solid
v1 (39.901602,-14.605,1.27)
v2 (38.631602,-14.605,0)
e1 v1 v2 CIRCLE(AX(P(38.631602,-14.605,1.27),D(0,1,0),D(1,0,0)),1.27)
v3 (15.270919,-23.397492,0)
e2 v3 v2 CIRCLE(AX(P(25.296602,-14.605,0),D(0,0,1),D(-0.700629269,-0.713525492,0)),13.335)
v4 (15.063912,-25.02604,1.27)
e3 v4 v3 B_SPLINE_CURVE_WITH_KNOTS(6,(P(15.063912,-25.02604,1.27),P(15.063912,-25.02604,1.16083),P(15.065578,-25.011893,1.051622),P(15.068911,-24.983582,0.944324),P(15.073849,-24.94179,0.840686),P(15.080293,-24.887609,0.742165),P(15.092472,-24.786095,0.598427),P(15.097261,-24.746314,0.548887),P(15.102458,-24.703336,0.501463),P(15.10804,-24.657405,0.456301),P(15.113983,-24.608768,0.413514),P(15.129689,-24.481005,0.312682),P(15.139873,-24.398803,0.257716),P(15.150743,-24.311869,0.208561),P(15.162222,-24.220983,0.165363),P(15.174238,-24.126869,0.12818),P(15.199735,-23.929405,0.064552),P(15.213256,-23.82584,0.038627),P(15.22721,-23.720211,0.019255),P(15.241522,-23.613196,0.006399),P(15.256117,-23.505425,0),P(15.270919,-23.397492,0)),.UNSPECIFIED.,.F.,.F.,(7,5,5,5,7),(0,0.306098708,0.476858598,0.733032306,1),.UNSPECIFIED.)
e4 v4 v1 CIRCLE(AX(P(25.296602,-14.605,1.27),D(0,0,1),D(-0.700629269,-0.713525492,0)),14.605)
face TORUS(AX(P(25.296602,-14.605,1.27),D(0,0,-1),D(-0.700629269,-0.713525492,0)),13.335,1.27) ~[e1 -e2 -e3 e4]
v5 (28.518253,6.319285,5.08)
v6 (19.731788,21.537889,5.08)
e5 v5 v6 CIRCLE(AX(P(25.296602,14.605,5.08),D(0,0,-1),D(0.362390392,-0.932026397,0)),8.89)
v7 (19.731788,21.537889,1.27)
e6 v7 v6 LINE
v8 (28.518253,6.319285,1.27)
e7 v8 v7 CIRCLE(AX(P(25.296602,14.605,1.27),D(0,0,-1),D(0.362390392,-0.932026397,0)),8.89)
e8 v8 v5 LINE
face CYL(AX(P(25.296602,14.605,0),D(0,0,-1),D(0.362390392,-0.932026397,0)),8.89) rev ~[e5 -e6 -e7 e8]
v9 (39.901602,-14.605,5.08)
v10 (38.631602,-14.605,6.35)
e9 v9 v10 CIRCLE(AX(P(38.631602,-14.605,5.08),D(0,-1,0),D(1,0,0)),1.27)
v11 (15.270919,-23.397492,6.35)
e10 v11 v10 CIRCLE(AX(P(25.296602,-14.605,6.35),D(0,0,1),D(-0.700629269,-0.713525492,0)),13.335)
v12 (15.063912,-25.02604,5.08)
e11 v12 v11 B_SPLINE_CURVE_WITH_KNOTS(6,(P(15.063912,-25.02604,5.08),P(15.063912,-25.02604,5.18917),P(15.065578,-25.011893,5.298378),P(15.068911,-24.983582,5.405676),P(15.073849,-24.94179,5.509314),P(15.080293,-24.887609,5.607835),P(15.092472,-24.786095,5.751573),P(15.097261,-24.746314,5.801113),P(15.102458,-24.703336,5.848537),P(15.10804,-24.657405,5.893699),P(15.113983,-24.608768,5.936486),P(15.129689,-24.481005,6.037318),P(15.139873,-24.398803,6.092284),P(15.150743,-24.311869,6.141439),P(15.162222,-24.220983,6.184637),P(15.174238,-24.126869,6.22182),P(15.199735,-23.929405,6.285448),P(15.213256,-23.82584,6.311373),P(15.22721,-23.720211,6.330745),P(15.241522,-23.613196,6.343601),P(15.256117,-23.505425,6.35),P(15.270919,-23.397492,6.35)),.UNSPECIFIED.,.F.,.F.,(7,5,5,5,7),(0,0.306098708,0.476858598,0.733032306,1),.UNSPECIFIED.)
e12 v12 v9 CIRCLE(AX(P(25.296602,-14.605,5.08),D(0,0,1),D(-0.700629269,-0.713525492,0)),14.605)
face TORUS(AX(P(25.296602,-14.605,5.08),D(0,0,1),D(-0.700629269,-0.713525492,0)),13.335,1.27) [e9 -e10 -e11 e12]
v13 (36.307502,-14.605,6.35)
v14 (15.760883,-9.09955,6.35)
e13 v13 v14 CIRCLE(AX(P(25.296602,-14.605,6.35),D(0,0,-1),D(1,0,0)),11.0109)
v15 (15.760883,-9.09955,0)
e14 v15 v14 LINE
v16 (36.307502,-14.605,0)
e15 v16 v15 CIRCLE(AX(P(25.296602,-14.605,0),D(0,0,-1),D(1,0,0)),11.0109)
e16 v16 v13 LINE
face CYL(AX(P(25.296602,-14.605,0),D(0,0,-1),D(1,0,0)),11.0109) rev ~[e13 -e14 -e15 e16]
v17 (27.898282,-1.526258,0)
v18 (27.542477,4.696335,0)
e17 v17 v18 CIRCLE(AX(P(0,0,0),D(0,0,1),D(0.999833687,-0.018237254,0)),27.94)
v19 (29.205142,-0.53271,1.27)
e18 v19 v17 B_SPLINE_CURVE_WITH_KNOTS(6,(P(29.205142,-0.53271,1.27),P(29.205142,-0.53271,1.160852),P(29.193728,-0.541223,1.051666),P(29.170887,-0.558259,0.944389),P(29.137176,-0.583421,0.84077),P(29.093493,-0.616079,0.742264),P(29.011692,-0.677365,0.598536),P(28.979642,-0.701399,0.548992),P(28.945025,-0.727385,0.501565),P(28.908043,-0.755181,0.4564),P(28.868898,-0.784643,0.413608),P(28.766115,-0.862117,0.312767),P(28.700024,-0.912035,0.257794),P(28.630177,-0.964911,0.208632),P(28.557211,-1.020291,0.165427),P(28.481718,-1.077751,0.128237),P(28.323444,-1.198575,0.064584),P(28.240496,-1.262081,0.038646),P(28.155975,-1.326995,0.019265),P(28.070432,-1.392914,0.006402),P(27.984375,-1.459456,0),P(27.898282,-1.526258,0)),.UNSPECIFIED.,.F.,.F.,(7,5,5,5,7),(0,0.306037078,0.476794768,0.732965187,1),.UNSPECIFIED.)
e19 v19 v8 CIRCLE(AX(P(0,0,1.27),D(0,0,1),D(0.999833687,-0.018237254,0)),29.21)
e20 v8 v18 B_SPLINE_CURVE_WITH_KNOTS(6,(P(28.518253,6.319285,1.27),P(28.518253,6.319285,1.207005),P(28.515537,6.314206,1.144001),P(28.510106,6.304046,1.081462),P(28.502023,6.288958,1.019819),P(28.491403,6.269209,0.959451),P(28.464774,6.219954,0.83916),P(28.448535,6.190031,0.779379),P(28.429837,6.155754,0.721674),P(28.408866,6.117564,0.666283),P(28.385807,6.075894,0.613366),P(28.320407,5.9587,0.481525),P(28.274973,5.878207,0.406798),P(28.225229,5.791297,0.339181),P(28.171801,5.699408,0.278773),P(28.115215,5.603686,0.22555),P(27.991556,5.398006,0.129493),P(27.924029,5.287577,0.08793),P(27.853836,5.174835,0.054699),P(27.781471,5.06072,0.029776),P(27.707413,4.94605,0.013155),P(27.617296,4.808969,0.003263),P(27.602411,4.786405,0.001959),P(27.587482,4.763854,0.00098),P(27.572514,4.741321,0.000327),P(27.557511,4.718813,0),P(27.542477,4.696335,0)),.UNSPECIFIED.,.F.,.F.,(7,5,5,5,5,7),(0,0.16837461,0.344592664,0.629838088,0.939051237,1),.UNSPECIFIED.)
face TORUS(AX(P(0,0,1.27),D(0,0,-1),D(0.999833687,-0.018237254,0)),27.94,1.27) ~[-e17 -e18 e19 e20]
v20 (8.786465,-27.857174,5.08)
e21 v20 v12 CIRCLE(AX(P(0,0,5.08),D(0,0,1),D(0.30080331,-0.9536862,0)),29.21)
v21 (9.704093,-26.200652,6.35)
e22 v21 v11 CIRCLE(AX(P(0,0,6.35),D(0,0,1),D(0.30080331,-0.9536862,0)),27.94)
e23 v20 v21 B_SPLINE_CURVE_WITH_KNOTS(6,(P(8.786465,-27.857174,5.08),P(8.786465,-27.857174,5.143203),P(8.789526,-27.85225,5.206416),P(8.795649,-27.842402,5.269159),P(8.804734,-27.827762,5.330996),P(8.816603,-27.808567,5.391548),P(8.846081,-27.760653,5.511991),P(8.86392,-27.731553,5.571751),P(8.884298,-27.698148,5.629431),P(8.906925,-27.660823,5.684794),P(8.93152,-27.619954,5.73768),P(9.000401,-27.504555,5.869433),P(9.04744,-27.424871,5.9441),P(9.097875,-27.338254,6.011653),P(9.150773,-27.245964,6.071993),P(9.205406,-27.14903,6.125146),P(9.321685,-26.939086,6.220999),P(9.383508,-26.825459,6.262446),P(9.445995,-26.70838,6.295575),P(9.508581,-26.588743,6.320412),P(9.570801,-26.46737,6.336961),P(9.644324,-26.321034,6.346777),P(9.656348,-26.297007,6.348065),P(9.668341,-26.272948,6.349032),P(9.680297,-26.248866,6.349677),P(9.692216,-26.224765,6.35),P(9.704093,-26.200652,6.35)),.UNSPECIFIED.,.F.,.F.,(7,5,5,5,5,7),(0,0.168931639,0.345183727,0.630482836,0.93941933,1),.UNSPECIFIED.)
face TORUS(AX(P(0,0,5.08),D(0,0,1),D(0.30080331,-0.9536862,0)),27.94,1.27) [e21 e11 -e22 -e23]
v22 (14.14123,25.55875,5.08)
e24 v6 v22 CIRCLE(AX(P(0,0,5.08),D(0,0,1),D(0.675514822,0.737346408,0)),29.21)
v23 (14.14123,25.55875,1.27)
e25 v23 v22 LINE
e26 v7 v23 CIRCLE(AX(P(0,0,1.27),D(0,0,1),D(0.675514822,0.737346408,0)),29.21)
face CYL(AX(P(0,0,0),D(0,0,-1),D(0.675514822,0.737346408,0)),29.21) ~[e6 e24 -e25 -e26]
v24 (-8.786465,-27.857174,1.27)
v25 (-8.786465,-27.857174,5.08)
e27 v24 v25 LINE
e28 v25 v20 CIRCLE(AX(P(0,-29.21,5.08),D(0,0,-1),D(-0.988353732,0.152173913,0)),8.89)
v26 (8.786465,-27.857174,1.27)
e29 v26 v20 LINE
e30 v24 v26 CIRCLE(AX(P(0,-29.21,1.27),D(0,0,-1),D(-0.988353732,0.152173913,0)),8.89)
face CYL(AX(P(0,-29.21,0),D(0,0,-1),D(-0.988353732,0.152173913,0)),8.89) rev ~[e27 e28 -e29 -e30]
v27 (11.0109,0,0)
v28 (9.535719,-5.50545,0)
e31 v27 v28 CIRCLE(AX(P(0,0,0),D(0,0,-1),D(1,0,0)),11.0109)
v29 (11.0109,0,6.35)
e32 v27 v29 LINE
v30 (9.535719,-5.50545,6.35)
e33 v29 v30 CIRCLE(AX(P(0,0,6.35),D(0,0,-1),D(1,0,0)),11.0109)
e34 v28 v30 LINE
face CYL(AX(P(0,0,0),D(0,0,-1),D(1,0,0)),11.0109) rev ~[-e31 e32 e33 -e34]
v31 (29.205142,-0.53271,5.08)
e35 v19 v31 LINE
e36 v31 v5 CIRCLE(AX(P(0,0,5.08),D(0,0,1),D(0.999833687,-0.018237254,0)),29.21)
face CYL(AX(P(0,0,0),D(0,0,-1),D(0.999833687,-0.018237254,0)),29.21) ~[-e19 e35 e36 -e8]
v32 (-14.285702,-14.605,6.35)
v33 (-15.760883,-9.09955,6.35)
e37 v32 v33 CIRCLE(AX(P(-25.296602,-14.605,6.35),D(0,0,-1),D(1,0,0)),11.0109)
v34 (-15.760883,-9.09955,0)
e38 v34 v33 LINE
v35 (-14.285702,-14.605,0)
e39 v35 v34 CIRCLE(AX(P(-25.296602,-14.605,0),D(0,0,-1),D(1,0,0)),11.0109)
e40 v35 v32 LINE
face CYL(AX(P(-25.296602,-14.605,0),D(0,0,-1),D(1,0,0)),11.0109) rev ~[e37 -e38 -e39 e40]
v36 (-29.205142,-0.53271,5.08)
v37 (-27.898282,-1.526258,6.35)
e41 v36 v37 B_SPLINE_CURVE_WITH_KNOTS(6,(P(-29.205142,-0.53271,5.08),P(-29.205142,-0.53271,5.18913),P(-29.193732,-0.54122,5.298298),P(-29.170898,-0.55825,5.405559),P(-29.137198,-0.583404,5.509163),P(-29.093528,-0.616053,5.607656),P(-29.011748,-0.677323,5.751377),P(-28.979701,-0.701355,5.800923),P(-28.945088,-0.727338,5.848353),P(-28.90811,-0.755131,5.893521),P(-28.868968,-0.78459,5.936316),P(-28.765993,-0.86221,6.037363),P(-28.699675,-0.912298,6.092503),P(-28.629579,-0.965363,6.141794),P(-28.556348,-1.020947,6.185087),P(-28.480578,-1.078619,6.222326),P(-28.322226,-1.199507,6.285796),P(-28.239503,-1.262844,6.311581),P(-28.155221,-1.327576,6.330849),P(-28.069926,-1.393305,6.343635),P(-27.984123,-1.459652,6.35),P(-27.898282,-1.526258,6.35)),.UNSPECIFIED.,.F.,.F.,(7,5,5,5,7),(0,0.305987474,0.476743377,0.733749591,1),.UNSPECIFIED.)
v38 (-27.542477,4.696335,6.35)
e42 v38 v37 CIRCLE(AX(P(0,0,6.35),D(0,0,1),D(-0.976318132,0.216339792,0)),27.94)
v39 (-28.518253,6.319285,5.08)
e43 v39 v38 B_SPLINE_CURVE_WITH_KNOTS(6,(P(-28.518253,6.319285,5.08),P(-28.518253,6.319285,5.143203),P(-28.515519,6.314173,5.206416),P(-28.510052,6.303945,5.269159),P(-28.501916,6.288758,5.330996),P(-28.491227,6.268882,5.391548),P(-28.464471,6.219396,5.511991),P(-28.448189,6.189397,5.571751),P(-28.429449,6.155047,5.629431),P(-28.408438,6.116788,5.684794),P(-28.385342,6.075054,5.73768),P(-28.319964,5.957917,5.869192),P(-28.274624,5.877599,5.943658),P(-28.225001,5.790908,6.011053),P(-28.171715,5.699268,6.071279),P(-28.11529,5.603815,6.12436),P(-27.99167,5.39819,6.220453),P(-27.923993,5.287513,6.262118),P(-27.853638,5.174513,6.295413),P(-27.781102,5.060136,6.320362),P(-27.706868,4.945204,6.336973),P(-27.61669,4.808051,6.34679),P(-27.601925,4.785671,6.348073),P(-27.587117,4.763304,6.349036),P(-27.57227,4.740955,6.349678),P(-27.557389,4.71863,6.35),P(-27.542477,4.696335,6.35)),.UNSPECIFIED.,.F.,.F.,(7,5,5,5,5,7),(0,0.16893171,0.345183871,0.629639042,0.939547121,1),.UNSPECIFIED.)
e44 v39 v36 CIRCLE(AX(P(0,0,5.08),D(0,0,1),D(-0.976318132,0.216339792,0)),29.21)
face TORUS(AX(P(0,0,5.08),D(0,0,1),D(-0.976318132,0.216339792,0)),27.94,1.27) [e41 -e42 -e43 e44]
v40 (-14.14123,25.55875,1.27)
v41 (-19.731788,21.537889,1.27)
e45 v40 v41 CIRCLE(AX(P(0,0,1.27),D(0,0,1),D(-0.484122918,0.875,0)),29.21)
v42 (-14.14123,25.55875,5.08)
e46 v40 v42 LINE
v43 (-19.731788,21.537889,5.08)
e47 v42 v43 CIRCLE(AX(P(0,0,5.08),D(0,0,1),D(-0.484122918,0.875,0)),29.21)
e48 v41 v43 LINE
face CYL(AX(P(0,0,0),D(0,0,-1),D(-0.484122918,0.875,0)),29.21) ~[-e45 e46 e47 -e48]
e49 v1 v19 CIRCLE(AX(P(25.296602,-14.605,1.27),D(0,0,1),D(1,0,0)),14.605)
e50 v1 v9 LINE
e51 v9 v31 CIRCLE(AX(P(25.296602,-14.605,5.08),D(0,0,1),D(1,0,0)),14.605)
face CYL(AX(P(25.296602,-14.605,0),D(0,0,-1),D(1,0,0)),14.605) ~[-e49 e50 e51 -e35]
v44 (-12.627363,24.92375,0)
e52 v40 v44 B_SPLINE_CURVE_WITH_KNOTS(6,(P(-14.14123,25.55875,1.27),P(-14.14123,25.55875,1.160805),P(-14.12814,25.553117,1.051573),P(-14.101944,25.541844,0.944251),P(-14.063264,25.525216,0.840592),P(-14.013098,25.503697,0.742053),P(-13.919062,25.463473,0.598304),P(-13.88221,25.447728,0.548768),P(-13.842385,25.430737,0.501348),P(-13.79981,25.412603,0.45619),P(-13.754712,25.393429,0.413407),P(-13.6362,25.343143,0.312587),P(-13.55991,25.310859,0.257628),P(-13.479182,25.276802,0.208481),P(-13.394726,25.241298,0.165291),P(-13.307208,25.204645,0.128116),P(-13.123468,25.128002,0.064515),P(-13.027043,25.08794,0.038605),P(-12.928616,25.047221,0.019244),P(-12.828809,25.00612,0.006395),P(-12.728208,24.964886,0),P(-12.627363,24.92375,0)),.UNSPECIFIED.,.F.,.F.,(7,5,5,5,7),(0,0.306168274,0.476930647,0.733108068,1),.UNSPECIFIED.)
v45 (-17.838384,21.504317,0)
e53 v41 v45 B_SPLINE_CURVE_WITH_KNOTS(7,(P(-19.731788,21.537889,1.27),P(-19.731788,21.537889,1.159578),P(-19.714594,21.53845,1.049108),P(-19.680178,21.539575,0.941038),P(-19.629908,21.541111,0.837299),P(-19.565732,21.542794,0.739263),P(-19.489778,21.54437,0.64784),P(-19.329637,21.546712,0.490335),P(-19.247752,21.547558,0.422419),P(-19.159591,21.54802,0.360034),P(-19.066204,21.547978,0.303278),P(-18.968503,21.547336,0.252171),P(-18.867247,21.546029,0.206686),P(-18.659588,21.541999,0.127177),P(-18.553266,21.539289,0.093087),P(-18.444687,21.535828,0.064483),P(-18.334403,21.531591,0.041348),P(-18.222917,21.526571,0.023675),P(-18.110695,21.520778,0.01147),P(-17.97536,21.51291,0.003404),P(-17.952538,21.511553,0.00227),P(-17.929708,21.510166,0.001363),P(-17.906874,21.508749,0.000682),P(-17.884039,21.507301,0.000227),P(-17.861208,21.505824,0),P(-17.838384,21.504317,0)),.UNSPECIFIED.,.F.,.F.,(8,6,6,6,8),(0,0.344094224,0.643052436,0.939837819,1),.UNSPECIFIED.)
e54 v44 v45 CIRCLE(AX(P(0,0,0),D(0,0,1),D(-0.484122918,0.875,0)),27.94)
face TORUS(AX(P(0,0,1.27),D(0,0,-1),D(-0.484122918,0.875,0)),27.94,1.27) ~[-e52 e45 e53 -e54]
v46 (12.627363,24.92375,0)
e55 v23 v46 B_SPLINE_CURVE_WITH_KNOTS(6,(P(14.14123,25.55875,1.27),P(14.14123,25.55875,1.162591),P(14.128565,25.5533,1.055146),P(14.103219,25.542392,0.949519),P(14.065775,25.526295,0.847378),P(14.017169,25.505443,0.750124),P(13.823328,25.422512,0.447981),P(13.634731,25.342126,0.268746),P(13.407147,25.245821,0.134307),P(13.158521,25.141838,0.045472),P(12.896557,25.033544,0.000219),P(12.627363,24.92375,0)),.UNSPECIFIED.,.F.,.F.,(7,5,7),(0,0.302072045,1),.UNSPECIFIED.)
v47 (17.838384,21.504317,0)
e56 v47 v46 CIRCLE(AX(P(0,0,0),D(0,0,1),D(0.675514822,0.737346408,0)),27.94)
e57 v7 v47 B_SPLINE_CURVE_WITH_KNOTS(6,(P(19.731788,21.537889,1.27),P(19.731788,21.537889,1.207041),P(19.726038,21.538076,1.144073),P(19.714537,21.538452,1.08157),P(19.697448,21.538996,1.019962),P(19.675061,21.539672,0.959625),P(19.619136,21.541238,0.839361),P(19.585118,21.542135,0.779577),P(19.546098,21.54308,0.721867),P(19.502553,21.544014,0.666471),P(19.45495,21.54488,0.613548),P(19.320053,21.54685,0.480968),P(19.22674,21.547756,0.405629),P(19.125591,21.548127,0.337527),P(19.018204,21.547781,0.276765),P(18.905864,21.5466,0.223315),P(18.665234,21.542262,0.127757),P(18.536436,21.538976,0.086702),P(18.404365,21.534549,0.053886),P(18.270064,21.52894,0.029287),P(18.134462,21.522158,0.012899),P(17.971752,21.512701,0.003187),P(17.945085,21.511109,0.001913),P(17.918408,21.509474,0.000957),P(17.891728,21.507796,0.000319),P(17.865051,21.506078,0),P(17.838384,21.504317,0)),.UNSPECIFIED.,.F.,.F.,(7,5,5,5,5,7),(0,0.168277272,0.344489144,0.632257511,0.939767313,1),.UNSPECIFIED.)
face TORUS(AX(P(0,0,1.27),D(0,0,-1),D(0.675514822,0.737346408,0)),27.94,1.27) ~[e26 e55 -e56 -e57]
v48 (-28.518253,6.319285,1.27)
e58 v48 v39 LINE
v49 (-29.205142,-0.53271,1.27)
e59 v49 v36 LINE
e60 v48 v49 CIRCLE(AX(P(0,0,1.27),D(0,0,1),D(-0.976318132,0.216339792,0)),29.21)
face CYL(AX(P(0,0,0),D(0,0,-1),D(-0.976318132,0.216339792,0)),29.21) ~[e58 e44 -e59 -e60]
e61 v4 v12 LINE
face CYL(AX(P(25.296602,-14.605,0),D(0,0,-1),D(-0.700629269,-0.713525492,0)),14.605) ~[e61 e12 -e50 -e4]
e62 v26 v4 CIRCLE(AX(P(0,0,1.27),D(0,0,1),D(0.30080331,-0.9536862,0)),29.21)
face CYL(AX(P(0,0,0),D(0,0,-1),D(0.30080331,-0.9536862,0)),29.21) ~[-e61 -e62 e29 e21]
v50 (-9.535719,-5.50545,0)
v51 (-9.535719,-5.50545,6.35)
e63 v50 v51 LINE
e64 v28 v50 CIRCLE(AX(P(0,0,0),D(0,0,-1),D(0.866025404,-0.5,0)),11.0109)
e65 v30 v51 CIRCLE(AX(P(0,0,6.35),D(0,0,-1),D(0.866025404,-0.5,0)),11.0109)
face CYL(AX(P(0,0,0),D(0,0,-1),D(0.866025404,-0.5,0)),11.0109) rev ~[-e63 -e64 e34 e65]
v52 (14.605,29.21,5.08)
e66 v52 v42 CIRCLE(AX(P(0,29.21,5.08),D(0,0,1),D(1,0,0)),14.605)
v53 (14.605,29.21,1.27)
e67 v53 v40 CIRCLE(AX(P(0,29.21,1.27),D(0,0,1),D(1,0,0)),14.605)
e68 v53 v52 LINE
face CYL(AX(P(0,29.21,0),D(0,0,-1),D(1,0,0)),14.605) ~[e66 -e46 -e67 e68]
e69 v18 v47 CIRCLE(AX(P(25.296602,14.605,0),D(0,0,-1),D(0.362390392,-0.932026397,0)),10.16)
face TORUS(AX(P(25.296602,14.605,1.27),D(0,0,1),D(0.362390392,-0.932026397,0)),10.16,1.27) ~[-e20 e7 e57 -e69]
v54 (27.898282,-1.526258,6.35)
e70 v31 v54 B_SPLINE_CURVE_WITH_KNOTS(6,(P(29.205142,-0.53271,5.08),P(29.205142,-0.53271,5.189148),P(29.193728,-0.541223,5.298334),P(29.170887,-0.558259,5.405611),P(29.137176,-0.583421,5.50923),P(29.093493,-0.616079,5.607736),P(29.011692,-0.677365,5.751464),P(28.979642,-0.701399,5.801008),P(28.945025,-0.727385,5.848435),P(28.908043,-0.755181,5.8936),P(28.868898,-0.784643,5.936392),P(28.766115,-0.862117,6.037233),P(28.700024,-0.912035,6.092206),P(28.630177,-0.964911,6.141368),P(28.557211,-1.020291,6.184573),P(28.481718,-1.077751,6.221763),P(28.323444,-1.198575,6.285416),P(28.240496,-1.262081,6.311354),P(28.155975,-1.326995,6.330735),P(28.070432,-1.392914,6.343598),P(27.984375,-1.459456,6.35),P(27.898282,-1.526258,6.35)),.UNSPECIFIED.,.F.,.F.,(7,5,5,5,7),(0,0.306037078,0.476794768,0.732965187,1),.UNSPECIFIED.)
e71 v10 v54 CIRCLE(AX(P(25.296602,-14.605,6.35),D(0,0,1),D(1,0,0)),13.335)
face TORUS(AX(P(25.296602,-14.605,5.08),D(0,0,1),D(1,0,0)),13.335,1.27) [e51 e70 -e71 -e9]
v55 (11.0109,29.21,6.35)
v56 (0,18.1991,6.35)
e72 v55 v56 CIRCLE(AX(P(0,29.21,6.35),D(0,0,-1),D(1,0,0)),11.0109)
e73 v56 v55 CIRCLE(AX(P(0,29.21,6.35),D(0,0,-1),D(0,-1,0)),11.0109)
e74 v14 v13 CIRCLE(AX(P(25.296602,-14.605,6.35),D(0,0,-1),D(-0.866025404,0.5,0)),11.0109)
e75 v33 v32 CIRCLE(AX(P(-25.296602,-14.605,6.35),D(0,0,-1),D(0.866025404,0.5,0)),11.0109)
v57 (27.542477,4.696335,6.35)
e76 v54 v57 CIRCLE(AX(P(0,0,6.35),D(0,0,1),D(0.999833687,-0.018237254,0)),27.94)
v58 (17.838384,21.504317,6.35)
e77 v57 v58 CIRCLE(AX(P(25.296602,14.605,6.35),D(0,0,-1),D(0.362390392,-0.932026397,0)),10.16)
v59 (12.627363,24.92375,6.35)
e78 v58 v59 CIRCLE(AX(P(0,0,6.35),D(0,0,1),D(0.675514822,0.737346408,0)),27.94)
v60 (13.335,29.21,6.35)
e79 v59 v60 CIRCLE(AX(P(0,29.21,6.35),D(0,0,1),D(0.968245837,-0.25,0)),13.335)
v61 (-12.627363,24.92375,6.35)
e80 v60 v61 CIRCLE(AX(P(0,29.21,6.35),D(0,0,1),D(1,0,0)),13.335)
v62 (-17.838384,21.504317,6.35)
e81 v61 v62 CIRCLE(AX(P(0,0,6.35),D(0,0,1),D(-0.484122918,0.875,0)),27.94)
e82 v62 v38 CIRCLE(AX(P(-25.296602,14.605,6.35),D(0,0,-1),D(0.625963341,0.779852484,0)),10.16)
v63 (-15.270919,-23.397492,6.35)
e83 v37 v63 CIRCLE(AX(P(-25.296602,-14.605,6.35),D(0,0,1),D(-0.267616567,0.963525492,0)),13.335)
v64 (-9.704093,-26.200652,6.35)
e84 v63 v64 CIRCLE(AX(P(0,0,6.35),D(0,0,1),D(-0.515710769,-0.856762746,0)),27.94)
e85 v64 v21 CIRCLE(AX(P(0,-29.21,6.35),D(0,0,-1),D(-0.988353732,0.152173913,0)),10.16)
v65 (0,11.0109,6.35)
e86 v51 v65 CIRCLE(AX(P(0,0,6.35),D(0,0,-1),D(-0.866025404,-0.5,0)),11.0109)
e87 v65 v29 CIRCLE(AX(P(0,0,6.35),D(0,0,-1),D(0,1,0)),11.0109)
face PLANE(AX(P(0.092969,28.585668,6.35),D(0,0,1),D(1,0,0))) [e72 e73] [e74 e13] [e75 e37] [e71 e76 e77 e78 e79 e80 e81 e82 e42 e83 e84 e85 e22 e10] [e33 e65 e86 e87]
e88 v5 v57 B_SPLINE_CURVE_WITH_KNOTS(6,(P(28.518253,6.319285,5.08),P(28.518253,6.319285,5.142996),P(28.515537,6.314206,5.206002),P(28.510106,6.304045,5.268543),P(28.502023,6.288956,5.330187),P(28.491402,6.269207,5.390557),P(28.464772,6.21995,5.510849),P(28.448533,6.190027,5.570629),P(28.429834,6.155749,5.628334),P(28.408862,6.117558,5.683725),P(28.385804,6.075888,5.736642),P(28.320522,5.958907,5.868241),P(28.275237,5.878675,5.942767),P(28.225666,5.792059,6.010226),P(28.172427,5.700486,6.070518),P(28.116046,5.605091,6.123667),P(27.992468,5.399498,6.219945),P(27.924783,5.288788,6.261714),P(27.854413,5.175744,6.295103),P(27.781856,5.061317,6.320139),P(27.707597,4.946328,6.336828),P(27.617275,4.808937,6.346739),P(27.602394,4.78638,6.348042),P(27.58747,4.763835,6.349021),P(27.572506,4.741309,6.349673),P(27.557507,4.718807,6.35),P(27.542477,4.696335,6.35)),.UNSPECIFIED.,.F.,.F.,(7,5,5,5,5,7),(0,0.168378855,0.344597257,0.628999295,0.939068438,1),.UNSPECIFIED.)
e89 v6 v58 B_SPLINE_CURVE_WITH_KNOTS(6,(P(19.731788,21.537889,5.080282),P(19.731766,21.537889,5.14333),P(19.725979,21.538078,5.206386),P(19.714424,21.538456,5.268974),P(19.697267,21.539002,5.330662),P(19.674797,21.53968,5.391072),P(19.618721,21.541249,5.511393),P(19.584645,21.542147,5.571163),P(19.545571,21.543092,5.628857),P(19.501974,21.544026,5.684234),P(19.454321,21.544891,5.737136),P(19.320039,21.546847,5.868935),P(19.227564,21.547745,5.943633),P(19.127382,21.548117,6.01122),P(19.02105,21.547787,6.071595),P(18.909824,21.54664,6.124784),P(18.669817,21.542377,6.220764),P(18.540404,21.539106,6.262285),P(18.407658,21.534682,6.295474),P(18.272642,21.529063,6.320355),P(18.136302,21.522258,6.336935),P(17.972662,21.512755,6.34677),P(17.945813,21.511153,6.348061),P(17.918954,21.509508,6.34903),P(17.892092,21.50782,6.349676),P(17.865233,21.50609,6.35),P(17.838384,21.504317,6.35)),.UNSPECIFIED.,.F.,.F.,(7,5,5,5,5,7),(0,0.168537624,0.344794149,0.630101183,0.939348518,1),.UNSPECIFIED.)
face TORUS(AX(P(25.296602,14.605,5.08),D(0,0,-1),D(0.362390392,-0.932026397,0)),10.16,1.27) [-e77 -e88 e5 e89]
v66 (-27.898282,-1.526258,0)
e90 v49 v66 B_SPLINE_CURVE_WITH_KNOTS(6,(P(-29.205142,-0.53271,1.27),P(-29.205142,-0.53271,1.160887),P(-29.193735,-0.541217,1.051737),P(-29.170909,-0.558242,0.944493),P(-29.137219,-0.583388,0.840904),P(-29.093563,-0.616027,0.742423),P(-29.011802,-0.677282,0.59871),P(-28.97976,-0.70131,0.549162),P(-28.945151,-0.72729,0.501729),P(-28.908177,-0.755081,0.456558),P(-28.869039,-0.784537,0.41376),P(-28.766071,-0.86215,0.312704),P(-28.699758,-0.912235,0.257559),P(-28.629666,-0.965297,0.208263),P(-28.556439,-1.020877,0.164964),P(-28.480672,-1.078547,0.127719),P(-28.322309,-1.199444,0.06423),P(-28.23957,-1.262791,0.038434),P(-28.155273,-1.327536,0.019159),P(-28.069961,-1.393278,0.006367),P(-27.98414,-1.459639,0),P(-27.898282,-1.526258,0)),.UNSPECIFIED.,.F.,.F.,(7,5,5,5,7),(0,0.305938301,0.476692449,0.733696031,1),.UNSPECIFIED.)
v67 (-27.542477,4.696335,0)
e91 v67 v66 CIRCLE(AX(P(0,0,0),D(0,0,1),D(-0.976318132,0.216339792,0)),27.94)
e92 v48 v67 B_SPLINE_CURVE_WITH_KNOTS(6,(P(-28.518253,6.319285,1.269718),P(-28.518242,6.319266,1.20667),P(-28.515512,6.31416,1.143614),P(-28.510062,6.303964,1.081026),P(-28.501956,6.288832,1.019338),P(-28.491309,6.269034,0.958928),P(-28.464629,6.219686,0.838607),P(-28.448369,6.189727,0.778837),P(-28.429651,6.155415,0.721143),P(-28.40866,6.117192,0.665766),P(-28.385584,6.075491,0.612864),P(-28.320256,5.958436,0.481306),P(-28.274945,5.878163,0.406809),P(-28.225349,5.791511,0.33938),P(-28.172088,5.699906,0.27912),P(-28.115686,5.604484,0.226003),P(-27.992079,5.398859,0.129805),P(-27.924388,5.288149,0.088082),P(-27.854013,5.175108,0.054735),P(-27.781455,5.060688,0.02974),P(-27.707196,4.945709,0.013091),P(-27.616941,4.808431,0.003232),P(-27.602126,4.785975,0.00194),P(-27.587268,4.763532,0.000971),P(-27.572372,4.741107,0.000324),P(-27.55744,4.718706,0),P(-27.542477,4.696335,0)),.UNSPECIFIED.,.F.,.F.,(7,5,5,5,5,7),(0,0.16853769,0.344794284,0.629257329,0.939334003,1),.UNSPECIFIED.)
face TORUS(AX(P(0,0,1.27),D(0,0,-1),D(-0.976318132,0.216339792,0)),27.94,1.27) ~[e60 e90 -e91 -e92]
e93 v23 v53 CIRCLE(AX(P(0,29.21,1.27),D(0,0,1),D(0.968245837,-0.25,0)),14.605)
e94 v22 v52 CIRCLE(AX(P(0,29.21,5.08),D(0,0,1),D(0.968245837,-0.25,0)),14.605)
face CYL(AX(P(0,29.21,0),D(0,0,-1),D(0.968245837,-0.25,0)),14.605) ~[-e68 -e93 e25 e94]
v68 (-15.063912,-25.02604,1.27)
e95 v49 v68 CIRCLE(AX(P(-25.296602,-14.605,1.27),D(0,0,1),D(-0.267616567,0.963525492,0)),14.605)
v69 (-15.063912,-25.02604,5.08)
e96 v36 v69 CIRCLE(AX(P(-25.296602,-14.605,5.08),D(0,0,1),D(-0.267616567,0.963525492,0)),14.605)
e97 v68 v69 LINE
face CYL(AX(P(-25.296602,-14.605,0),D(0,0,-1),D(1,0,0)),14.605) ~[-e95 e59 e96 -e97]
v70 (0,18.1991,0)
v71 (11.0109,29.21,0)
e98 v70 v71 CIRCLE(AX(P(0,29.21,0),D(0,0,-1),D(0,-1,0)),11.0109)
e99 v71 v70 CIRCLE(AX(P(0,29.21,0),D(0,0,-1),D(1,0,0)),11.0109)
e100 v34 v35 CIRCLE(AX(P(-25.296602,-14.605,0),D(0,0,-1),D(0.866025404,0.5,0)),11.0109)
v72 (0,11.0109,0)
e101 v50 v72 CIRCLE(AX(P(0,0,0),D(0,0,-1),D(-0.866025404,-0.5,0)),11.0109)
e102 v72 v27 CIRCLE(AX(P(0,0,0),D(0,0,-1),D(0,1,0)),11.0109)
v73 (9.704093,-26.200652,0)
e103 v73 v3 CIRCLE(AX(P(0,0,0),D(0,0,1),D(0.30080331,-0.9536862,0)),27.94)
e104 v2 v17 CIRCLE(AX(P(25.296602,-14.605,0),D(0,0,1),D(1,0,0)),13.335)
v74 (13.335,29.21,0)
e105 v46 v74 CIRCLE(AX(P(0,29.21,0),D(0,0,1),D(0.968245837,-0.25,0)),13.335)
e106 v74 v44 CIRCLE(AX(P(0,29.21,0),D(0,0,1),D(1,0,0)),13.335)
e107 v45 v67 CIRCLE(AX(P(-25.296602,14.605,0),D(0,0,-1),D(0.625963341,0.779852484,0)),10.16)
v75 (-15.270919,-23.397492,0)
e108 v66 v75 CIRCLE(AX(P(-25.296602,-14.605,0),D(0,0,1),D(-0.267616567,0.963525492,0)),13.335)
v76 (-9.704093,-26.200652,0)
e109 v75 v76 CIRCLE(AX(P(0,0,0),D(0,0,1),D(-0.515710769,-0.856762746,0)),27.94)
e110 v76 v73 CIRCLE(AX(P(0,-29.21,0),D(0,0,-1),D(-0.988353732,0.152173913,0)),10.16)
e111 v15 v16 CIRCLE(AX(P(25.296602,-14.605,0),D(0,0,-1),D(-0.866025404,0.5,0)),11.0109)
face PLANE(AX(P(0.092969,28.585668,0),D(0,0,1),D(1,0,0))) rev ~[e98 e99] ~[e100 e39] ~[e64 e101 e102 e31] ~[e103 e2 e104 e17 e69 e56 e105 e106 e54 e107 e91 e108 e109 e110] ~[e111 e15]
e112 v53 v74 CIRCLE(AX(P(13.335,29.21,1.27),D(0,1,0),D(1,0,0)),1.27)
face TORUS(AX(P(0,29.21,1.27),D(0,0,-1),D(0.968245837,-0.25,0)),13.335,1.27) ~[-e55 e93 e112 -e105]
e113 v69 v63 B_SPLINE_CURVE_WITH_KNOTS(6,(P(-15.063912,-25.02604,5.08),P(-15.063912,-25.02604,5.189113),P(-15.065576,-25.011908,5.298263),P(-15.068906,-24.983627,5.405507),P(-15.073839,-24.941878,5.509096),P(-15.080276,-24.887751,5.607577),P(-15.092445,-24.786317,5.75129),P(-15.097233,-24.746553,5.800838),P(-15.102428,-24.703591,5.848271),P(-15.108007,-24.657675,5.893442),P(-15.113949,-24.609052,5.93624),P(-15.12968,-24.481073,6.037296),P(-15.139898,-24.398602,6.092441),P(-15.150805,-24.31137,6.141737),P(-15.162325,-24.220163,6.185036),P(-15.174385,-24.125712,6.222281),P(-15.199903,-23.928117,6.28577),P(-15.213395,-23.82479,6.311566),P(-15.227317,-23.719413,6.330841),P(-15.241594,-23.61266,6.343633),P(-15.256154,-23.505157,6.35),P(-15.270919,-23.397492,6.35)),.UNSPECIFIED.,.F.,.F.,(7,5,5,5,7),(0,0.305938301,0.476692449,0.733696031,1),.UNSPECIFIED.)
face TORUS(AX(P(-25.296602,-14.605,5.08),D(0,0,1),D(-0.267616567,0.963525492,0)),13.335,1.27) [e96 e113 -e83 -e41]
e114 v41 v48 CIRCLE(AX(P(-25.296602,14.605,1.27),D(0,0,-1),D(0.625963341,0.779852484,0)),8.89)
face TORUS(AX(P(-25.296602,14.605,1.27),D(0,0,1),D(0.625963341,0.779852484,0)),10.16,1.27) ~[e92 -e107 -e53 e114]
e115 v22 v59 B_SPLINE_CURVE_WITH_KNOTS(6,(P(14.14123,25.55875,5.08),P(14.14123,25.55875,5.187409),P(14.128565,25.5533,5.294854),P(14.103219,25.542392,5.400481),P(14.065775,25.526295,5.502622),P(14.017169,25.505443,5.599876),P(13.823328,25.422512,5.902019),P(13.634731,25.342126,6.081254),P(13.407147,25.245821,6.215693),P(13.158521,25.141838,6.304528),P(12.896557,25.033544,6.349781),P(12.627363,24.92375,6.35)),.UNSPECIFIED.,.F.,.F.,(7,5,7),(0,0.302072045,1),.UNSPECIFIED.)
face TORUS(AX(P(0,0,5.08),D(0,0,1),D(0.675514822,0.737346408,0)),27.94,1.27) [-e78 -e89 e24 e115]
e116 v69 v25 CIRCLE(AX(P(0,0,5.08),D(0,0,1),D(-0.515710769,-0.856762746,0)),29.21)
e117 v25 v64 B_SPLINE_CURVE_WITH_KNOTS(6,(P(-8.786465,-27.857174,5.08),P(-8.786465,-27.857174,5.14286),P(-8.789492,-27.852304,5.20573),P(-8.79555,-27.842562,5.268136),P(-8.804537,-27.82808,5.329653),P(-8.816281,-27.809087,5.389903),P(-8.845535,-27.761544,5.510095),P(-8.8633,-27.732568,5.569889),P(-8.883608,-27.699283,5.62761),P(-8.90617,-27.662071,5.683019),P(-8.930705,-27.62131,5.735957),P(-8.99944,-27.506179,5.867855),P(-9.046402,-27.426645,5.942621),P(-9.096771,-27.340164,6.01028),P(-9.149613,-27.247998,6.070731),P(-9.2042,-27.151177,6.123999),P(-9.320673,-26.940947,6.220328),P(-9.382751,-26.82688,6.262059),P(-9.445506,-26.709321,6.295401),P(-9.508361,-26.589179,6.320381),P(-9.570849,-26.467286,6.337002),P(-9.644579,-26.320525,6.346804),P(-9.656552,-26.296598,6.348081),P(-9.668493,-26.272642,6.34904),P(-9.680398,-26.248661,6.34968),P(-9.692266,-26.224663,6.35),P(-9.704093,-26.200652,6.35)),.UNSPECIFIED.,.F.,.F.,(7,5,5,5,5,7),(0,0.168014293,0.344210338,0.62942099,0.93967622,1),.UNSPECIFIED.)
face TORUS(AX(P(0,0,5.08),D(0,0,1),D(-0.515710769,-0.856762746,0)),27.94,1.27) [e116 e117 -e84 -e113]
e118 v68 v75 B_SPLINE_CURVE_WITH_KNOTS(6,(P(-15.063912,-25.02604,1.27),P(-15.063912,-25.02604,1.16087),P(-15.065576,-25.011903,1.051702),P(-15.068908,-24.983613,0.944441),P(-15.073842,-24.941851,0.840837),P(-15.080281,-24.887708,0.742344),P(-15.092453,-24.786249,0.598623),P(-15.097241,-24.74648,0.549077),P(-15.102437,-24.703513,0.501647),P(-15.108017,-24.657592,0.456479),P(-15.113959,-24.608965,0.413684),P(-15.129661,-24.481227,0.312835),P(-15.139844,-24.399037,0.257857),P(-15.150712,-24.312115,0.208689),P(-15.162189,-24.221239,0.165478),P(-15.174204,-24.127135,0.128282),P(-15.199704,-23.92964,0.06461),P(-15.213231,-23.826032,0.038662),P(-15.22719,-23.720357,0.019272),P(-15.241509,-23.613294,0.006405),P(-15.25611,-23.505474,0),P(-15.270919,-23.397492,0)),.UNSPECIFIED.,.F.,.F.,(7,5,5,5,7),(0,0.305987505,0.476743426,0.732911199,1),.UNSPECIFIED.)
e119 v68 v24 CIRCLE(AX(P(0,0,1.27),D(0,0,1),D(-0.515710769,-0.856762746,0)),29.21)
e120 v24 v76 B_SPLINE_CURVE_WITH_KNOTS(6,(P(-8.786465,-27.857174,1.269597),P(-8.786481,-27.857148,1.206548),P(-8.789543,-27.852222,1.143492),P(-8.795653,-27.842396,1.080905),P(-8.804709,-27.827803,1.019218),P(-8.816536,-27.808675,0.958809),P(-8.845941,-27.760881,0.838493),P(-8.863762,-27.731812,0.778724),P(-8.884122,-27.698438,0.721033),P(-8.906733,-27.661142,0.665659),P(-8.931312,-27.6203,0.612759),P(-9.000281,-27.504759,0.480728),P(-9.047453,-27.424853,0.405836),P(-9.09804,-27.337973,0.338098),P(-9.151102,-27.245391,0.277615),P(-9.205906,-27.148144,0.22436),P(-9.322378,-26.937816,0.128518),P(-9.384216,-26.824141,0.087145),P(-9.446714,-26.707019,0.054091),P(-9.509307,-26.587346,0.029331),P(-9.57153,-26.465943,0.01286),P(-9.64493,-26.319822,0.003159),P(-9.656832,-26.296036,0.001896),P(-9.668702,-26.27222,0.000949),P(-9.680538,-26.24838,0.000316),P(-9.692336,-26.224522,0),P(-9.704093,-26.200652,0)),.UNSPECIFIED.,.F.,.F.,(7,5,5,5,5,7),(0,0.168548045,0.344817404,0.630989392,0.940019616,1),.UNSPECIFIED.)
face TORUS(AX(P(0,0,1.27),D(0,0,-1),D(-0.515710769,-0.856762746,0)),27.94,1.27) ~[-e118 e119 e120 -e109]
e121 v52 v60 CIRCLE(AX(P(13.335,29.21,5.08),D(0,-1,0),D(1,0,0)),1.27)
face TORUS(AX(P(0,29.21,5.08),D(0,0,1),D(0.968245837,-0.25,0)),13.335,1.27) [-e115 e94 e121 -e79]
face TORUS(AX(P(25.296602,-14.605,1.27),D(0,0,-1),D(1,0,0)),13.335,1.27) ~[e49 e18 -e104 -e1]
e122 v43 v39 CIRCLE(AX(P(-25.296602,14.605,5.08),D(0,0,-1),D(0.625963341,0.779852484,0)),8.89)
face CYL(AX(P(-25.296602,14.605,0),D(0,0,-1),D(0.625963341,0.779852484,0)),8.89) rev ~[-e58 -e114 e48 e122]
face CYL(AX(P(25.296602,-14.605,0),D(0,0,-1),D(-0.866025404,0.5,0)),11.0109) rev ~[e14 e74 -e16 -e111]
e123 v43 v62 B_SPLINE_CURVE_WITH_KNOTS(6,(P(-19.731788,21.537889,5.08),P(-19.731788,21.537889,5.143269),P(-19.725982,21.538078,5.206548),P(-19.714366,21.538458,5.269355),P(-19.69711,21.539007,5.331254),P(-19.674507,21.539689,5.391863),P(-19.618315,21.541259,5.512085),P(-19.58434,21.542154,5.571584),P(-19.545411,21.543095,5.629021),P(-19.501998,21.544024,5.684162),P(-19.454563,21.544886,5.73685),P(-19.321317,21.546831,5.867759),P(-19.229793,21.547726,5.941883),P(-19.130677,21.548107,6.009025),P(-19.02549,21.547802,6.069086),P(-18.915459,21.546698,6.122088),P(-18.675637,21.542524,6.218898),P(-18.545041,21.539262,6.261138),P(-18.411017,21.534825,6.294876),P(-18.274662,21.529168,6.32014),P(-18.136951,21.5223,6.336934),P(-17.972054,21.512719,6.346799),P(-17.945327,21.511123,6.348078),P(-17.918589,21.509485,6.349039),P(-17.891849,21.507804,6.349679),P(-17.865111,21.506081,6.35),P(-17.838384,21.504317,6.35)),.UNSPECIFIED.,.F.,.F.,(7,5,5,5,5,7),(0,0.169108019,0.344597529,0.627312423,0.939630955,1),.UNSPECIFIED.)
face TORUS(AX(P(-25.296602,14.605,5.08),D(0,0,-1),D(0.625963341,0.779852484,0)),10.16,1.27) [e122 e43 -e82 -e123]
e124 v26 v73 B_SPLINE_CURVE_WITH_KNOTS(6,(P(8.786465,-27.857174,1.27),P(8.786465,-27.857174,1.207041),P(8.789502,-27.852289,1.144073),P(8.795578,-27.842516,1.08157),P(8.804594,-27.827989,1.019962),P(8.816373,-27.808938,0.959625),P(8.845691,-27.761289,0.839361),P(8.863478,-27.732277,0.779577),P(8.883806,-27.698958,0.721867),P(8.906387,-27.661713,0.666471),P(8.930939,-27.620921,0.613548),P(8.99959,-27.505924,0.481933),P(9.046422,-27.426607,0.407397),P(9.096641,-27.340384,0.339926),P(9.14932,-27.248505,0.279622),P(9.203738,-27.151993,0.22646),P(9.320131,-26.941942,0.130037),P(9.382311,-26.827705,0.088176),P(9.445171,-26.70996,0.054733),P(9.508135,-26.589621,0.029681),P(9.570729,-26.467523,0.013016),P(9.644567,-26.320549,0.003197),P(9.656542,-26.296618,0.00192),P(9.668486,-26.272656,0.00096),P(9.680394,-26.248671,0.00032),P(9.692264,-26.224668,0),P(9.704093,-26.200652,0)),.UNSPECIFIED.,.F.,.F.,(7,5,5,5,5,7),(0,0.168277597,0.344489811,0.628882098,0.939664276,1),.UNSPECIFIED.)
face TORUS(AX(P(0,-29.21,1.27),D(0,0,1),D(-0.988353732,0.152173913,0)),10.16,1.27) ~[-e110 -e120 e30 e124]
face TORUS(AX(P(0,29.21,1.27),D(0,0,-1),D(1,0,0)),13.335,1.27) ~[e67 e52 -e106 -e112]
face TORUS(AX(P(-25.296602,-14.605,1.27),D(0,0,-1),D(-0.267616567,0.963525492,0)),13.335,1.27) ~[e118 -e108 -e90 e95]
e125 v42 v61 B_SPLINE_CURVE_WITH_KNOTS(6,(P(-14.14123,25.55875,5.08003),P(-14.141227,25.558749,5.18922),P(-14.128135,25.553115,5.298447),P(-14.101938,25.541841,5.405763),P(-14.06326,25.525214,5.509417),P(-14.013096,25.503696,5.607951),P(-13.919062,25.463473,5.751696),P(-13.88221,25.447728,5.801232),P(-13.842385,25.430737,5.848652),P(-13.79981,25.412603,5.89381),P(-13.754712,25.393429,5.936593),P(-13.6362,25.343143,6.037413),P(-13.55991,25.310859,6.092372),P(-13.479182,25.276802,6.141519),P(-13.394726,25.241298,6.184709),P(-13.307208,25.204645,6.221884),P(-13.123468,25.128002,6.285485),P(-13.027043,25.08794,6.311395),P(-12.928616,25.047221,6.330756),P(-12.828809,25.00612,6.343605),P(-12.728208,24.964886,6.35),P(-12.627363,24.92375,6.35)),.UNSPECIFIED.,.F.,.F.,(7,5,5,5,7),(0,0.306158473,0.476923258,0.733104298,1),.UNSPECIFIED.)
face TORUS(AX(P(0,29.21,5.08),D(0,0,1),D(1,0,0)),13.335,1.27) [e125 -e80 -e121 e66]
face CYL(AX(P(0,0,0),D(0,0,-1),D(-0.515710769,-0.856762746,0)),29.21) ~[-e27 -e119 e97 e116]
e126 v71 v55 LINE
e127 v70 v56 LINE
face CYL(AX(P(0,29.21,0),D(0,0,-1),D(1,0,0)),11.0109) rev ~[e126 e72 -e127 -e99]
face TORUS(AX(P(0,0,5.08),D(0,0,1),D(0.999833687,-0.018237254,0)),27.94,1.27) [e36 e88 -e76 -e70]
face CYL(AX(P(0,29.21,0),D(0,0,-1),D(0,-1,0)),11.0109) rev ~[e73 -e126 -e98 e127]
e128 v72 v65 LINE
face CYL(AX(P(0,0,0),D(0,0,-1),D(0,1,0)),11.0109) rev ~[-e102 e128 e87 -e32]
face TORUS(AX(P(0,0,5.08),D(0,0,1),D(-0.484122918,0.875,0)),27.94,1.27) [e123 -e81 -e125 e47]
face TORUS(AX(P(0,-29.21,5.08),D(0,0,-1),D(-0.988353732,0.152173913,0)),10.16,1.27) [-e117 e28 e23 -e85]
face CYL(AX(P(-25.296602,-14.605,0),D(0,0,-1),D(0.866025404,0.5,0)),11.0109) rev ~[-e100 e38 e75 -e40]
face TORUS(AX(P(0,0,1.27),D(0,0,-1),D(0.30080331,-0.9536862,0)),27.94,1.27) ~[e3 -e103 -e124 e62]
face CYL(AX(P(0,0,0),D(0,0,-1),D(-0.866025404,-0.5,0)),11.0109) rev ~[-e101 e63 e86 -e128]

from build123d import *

# Parameters (mm, degrees)
F1_DEPTH = 6.35
F2_R     = 1.27


# Not quite as in the source:
# - ends of sketch curves that miss each other by under 0.0002 mm in the source are joined


with BuildPart() as f1:
    # F0 (on Top) → F1 (new body)
    with BuildSketch(Plane.XY):
        with BuildLine():
            ThreePointArc((-14.1412304428, 25.55875), (-8.9436994156, 17.6637336874), (1.95e-08, 14.605))
            ThreePointArc((1.95e-08, 14.605), (8.943699431, 17.6637336993), (14.1412304428, 25.55875))
            ThreePointArc((14.1412304428, 25.55875), (14.488593714, 27.3697073083), (14.605, 29.21))
            ThreePointArc((14.605, 29.21), (-1.8402926917, 43.698593714), (-14.1412304428, 25.55875))
        make_face()
        with BuildLine():
            ThreePointArc((11.0109, 29.21), (7.785882057, 21.424117943), (0, 18.1991))
            ThreePointArc((0, 18.1991), (-7.785882057, 36.995882057), (11.0109, 29.21))
        make_face(mode=Mode.SUBTRACT)
        with BuildLine():
            ThreePointArc((-10.6916020445, -14.605), (-11.1892553654, -10.8249477946), (-12.6483010757, -7.3024999074))
            ThreePointArc((-12.6483010757, -7.3024999074), (-19.7690918652, -1.086395922), (-29.2051420104, -0.5327101957))
            ThreePointArc((-29.2051420104, -0.5327101957), (-37.9449030668, -21.9075), (-15.0639115676, -25.0260398043))
            ThreePointArc((-15.0639115676, -25.0260398043), (-11.8289654773, -20.2555566356), (-10.6916020445, -14.605))
        make_face()
        with BuildLine():
            ThreePointArc((-14.2857020445, -14.605), (-35.9323147252, -17.4548306237), (-15.760882926, -9.09955))
            ThreePointArc((-15.760882926, -9.09955), (-14.6608893639, -11.7551693763), (-14.2857020445, -14.605))
        make_face(mode=Mode.SUBTRACT)
        with BuildLine():
            ThreePointArc((29.2051420104, -0.5327101957), (19.7690918491, -1.0863959286), (12.6483010583, -7.3024999376))
            ThreePointArc((12.6483010583, -7.3024999376), (10.8253923876, -16.5773377154), (15.0639115676, -25.0260398043))
            ThreePointArc((15.0639115676, -25.0260398043), (30.9471586801, -28.0726365673), (39.9016020445, -14.605))
            ThreePointArc((39.9016020445, -14.605), (36.9239459201, -5.7669629216), (29.2051420104, -0.5327101957))
        make_face()
        with BuildLine():
            ThreePointArc((36.3075020445, -14.605), (22.4467714208, -25.2407126807), (15.760882926, -9.09955))
            ThreePointArc((15.760882926, -9.09955), (28.1464326683, -3.9692873193), (36.3075020445, -14.605))
        make_face(mode=Mode.SUBTRACT)
        with BuildLine():
            ThreePointArc((-12.6483010757, -7.3024999074), (-12.6483009907, 7.3025000547), (1.95e-08, 14.605))
            ThreePointArc((1.95e-08, 14.605), (-8.9436994156, 17.6637336874), (-14.1412304428, 25.55875))
            ThreePointArc((-14.1412304428, 25.55875), (-17.0554148392, 23.7136442721), (-19.7317879462, 21.5378885791))
            ThreePointArc((-19.7317879462, 21.5378885791), (-17.5976362049, 10.16), (-28.5182526265, 6.3192853339))
            ThreePointArc((-28.5182526265, 6.3192853339), (-29.0643257755, 2.9136003868), (-29.2051420104, -0.5327101957))
            ThreePointArc((-29.2051420104, -0.5327101957), (-19.7690918652, -1.086395922), (-12.6483010757, -7.3024999074))
        make_face()
        with BuildLine():
            ThreePointArc((15.0639115676, -25.0260398043), (10.8253923876, -16.5773377154), (12.6483010583, -7.3024999376))
            ThreePointArc((12.6483010583, -7.3024999376), (-1.74e-08, -14.605), (-12.6483010757, -7.3024999074))
            ThreePointArc((-12.6483010757, -7.3024999074), (-11.1892553654, -10.8249477946), (-10.6916020445, -14.605))
            ThreePointArc((-10.6916020445, -14.605), (-11.8289654773, -20.2555566356), (-15.0639115676, -25.0260398043))
            ThreePointArc((-15.0639115676, -25.0260398043), (-12.0089109363, -26.6272446589), (-8.7864646803, -27.857173913))
            ThreePointArc((-8.7864646803, -27.857173913), (0, -20.32), (8.7864646803, -27.857173913))
            ThreePointArc((8.7864646803, -27.857173913), (12.0089109363, -26.6272446589), (15.0639115676, -25.0260398043))
        make_face()
        with BuildLine():
            ThreePointArc((14.1412304428, 25.55875), (8.943699431, 17.6637336993), (1.95e-08, 14.605))
            ThreePointArc((1.95e-08, 14.605), (10.3272945461, 10.3272945323), (14.605, 0))
            ThreePointArc((14.605, 0), (14.1073467023, -3.7800521189), (12.6483010583, -7.3024999376))
            ThreePointArc((12.6483010583, -7.3024999376), (19.7690918491, -1.0863959286), (29.2051420104, -0.5327101957))
            ThreePointArc((29.2051420104, -0.5327101957), (29.0643257755, 2.9136003868), (28.5182526265, 6.3192853339))
            ThreePointArc((28.5182526265, 6.3192853339), (17.5976362049, 10.16), (19.7317879462, 21.5378885791))
            ThreePointArc((19.7317879462, 21.5378885791), (17.0554148392, 23.7136442721), (14.1412304428, 25.55875))
        make_face()
        with BuildLine():
            ThreePointArc((-9.5357191185, -5.50545), (-9.5357191185, 5.50545), (0, 11.0109))
            Line((0, 11.0109), (0, 14.605))
            ThreePointArc((0, 14.605), (-12.6483009907, 7.3025000547), (-12.6483010757, -7.3024999074))
            Line((-12.6483010757, -7.3024999074), (-9.5357191185, -5.50545))
        make_face()
        with BuildLine():
            Line((12.6483010223, -7.3025), (9.5357191185, -5.50545))
            ThreePointArc((9.5357191185, -5.50545), (0, -11.0109), (-9.5357191185, -5.50545))
            Line((-9.5357191185, -5.50545), (-12.6483010223, -7.3025))
            ThreePointArc((-12.6483010223, -7.3025), (-1.74e-08, -14.605), (12.6483010223, -7.3025))
        make_face()
        with BuildLine():
            ThreePointArc((0, 11.0109), (7.785882057, 7.785882057), (11.0109, 0))
            ThreePointArc((11.0109, 0), (10.6357126807, -2.8498306237), (9.5357191185, -5.50545))
            Line((9.5357191185, -5.50545), (12.6483010223, -7.3025))
            ThreePointArc((12.6483010583, -7.3024999376), (14.1073467023, -3.7800521189), (14.605, 0))
            ThreePointArc((14.605, 0), (10.3272945461, 10.3272945323), (1.95e-08, 14.605))
            Line((0, 14.605), (0, 11.0109))
        make_face()
    extrude(amount=F1_DEPTH)

    # F2
    f2_edges = [f1.edges().sort_by_distance(p)[0] for p in [
        (0, 43.815, 6.35),
        (-17.597636, 10.16, 6.35),
        (-37.944903, -21.9075, 6.35),
        (-29.064326, 2.9136, 6.35),
        (-12.008911, -26.627245, 6.35),
        (0, -20.32, 6.35),
        (12.008911, -26.627245, 6.35),
        (37.944903, -21.9075, 6.35),
        (29.064326, 2.9136, 6.35),
        (17.597636, 10.16, 6.35),
        (17.055415, 23.713644, 6.35),
        (-17.055415, 23.713644, 6.35),
        (0, 43.815, 0),
        (17.055415, 23.713644, 0),
        (17.597636, 10.16, 0),
        (29.064326, 2.9136, 0),
        (37.944903, -21.9075, 0),
        (12.008911, -26.627245, 0),
        (0, -20.32, 0),
        (-12.008911, -26.627245, 0),
        (-37.944903, -21.9075, 0),
        (-29.064326, 2.9136, 0),
        (-17.055415, 23.713644, 0),
        (-17.597636, 10.16, 0),
    ]]
    fillet(f2_edges, radius=F2_R)


solid = f1.part
